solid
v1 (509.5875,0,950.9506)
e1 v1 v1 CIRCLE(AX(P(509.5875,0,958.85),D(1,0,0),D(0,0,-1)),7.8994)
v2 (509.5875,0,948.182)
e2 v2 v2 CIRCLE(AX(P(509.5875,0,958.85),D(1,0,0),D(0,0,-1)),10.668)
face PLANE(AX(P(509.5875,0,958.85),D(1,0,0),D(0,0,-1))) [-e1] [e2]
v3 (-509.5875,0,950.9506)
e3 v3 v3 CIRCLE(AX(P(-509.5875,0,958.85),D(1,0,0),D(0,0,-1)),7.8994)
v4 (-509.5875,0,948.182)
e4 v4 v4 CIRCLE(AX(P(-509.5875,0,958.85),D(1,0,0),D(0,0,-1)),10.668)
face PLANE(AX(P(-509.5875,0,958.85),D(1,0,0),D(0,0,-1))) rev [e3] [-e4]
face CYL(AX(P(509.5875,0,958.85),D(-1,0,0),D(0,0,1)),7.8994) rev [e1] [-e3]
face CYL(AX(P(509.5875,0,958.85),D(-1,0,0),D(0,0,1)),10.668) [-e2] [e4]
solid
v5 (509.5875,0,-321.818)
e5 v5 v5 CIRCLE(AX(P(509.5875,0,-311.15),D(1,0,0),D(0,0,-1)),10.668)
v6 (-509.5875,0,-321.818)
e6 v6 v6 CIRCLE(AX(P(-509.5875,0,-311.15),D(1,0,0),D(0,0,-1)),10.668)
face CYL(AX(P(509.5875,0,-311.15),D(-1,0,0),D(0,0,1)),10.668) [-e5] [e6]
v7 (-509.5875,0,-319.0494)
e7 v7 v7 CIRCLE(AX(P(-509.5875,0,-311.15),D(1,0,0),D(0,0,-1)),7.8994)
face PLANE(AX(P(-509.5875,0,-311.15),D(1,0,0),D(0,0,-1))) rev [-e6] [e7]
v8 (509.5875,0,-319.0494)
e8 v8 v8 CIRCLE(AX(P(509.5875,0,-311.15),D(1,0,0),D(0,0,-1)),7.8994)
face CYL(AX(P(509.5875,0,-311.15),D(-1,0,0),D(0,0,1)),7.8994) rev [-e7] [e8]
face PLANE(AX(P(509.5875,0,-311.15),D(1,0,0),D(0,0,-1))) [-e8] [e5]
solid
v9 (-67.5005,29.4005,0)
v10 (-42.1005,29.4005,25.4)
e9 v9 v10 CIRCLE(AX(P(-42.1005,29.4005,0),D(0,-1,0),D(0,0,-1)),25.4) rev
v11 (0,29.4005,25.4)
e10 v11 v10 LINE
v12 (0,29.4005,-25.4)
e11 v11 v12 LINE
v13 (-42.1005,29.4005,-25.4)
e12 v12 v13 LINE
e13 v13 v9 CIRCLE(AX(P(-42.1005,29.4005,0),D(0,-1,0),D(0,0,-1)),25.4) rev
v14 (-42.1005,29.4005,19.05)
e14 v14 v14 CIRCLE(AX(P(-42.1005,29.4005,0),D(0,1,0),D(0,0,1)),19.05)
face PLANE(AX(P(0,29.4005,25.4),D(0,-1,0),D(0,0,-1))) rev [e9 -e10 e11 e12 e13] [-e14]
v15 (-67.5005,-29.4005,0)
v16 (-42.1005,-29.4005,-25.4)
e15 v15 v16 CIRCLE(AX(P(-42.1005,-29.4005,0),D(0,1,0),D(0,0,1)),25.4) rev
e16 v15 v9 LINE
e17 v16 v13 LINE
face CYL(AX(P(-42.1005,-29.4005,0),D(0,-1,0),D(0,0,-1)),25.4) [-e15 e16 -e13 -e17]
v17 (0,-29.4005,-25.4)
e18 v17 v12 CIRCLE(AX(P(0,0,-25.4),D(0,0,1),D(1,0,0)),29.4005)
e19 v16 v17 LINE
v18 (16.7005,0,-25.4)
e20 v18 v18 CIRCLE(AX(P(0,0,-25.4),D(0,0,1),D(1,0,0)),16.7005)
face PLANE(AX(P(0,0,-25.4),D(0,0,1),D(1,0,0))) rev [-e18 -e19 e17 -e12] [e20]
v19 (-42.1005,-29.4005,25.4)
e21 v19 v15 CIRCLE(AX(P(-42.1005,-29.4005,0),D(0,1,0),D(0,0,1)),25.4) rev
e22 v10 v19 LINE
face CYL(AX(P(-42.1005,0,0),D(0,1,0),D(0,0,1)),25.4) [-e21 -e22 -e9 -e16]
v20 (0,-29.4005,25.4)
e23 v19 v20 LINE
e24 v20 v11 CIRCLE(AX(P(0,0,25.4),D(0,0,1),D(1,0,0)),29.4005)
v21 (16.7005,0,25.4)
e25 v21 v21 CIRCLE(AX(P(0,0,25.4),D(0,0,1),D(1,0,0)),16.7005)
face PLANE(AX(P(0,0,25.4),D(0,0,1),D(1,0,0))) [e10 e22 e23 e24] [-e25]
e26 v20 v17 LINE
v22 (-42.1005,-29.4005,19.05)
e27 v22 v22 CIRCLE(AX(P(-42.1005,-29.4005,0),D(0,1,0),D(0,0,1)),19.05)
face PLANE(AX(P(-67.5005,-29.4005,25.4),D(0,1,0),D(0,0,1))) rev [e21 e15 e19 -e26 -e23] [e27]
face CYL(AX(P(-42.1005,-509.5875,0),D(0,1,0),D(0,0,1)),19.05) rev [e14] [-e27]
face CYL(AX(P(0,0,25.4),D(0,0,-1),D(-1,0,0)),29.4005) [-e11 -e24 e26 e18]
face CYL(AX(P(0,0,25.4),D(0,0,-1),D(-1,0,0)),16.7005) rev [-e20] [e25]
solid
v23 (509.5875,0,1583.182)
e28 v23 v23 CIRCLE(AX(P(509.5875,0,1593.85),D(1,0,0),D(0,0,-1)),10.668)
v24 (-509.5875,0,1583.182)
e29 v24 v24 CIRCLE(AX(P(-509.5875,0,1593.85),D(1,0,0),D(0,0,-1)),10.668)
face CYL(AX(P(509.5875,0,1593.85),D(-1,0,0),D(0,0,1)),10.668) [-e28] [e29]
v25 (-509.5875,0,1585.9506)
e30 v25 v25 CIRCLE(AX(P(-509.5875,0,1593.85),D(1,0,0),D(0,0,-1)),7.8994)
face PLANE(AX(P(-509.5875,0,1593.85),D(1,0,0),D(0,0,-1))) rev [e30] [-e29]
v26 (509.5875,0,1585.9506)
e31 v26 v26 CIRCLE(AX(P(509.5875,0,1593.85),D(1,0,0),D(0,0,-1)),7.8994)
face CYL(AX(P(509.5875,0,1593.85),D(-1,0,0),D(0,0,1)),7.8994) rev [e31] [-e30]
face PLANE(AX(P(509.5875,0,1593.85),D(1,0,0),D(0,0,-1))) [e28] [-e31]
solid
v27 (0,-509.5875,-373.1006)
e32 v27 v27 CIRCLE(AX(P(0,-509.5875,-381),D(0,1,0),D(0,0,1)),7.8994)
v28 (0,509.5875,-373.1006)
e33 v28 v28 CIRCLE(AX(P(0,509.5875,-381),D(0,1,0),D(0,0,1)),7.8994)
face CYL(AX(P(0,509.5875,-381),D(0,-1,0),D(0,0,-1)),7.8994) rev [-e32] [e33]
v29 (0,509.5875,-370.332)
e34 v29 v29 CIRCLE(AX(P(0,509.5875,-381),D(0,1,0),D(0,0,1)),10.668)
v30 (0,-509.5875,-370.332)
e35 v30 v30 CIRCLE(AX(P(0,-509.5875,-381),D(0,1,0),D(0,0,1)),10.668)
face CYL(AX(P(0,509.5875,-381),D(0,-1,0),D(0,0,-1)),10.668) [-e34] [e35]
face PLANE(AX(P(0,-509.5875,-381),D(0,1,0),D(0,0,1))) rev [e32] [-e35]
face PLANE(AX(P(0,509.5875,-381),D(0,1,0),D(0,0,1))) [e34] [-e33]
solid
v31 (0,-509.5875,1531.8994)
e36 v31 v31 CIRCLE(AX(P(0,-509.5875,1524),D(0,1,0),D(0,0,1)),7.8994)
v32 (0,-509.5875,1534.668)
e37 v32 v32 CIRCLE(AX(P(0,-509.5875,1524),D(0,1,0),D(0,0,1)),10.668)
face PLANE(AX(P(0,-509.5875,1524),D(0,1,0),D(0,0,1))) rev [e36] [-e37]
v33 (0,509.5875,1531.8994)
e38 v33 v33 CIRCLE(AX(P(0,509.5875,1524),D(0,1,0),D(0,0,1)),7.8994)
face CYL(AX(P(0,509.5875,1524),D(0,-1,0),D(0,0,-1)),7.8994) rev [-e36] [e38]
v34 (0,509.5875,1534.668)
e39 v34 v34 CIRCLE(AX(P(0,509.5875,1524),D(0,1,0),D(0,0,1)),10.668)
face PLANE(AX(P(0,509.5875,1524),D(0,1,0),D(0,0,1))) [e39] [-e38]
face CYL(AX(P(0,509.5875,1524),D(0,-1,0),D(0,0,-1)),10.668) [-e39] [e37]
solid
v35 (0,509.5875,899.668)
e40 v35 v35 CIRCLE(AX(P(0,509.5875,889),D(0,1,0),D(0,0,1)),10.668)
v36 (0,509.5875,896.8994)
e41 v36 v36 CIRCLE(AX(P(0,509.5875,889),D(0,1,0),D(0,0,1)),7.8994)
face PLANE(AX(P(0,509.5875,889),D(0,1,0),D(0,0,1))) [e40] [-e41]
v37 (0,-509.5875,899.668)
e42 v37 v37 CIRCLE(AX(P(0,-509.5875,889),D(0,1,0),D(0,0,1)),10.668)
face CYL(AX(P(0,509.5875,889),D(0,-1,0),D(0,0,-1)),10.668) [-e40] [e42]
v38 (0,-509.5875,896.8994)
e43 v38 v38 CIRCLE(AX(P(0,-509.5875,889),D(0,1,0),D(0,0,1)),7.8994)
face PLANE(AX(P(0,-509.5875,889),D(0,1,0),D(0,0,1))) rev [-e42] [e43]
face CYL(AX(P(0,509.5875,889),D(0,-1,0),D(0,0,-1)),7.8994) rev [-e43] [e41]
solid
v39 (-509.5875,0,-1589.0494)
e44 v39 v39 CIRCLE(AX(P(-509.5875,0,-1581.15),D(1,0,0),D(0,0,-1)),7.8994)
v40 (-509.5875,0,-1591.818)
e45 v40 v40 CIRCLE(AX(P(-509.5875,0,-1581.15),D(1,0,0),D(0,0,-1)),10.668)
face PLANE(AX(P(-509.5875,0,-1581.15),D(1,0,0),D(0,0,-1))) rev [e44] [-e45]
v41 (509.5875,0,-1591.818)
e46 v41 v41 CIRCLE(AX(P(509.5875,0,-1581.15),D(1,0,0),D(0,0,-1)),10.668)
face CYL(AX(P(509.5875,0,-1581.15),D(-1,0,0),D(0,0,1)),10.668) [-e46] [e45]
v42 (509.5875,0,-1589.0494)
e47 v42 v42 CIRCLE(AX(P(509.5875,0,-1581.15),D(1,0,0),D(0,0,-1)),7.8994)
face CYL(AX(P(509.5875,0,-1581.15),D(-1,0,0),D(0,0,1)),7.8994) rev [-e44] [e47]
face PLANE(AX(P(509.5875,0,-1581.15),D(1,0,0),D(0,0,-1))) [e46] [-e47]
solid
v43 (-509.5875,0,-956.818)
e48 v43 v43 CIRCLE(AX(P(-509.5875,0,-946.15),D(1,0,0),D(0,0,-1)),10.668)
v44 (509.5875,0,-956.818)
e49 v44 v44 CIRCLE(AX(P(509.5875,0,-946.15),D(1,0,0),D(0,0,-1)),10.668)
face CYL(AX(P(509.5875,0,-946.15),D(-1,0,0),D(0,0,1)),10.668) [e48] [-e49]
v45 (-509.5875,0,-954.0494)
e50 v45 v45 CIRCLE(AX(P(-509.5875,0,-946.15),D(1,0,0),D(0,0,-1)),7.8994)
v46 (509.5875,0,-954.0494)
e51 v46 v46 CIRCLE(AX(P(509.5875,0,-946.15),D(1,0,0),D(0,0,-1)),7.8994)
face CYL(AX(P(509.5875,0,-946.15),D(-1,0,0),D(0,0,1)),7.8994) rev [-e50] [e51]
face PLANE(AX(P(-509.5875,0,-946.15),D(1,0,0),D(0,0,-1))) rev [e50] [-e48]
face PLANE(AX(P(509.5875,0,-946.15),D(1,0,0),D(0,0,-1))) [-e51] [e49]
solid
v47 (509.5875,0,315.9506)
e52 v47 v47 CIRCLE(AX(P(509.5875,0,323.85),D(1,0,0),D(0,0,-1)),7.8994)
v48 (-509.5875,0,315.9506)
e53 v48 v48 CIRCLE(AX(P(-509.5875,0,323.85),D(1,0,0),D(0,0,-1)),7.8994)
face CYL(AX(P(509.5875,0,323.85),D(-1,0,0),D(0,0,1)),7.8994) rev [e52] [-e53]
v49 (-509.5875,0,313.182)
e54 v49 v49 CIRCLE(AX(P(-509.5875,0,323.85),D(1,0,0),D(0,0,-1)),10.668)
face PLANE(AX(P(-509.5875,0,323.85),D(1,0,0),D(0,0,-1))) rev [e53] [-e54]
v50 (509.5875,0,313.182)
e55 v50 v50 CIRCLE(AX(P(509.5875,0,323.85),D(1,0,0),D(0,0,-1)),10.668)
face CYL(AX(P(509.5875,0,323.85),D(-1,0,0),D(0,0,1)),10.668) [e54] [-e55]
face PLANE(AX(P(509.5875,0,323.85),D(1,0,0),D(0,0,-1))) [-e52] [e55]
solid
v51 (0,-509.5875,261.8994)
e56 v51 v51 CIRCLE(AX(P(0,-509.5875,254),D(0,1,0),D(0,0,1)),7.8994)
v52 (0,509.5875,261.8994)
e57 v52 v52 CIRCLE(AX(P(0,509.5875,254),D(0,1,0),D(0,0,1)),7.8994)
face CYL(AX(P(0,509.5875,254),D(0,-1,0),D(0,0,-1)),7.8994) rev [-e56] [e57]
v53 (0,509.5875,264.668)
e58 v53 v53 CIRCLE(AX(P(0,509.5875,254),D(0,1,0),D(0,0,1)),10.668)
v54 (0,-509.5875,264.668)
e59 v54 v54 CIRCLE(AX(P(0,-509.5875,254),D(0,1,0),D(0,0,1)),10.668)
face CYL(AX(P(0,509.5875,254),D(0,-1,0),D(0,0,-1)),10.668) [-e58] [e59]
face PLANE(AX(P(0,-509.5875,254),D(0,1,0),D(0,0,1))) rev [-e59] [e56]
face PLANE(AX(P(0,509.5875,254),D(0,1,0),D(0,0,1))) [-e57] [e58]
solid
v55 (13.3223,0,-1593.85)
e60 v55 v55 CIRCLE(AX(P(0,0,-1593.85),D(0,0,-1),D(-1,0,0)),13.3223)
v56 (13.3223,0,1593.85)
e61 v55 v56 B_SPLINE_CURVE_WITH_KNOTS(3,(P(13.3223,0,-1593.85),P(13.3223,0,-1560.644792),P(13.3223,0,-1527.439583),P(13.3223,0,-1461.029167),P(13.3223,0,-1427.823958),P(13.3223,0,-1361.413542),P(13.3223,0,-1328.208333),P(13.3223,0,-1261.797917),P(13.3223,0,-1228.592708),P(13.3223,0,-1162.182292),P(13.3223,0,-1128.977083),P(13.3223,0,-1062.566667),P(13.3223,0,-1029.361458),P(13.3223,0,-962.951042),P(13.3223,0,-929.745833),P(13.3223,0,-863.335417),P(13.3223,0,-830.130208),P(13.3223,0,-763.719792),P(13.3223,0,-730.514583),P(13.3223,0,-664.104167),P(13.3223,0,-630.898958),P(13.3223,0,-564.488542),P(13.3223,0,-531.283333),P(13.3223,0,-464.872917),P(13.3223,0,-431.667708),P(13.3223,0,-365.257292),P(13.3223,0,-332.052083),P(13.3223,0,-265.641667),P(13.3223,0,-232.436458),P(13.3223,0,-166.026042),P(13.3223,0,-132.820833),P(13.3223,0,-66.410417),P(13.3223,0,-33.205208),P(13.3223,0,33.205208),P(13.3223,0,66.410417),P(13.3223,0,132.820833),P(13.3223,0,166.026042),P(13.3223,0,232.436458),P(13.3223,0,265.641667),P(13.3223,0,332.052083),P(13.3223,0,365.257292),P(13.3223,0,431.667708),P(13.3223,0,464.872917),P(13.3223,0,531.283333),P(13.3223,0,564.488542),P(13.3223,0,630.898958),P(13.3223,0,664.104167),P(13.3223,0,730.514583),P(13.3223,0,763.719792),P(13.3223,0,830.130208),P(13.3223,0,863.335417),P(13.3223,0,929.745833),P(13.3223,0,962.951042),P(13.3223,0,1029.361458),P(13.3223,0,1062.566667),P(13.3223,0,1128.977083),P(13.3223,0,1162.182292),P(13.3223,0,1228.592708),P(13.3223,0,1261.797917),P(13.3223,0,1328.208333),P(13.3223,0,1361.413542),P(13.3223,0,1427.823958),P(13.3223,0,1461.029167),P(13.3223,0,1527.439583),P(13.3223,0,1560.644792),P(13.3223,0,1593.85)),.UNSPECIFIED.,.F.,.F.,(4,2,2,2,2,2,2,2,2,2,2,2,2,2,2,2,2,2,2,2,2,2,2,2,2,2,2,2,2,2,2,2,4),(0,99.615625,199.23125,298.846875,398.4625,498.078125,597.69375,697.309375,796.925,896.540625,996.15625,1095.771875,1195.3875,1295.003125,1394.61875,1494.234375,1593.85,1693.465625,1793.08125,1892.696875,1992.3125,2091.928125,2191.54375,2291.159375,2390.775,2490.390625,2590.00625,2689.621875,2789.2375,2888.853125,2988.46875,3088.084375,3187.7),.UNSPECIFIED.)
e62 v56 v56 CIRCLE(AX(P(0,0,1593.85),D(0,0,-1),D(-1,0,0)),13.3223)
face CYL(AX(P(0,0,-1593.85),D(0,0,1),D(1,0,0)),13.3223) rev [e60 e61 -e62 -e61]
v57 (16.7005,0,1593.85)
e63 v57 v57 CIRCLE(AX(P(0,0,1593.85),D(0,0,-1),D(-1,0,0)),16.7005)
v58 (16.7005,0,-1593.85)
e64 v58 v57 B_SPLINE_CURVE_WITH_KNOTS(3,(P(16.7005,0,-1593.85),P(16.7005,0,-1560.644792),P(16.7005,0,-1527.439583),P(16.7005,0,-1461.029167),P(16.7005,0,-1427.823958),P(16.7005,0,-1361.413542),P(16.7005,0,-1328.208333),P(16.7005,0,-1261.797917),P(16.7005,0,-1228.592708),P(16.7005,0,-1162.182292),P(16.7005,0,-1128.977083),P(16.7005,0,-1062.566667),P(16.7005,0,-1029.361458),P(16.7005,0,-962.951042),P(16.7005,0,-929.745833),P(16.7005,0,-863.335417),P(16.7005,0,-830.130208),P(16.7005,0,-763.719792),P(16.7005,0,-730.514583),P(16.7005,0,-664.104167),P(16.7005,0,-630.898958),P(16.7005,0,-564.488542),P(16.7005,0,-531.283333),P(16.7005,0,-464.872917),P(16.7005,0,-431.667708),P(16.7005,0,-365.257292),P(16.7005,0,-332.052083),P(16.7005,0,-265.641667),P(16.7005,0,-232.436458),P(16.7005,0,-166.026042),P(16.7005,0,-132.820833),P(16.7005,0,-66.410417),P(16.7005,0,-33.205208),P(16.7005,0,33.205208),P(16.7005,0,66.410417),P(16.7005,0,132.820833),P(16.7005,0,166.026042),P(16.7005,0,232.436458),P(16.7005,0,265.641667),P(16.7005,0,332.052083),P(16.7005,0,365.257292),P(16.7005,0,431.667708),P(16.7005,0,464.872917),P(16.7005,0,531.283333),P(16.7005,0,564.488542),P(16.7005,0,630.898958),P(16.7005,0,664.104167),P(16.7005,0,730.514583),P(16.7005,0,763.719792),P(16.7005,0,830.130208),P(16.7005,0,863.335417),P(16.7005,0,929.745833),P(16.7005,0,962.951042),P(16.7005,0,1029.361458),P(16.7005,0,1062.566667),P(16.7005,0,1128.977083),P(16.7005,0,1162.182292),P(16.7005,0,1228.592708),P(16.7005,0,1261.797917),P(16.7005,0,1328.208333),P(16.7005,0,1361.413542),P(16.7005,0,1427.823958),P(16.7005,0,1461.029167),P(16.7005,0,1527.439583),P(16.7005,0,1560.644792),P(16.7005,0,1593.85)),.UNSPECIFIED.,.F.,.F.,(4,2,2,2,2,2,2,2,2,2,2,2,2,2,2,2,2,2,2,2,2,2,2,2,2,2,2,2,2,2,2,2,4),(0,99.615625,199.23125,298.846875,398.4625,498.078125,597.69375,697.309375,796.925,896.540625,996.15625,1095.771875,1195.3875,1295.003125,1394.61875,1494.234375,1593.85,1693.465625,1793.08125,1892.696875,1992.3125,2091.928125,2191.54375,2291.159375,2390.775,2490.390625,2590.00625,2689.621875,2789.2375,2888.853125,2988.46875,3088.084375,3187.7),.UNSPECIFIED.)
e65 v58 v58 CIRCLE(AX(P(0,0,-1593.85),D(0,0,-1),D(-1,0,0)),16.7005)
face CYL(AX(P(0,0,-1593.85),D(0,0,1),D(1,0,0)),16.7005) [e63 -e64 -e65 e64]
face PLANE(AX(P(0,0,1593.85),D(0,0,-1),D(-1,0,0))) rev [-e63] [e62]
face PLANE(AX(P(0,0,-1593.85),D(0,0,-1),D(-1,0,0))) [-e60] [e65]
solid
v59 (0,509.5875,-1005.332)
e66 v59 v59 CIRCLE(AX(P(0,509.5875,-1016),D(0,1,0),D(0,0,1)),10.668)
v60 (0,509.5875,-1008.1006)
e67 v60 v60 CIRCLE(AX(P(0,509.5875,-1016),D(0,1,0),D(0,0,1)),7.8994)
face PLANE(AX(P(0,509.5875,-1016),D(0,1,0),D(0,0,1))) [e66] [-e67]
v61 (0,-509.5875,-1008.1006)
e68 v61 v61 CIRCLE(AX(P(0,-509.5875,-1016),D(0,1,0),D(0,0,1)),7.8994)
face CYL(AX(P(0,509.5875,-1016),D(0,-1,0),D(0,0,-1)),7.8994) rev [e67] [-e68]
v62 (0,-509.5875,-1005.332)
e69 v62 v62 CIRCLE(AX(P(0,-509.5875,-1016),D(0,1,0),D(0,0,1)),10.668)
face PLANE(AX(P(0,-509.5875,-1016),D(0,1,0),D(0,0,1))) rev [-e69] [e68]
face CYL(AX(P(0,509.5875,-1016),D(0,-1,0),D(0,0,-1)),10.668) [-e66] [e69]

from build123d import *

# Parameters (mm, degrees)
SKETCH11_R                 = 16.7005
SKETCH11_R_2               = 13.3223
PIPE_1_0_SCH_40_1_DEPTH    = 3187.7
SKETCH12_R                 = 10.668
SKETCH12_R_2               = 7.8994
PIPE_0_5_SCH_40_1_DEPTH    = 1019.175
SKETCH12_ON_SEGMENT_2_R    = 10.668
SKETCH12_ON_SEGMENT_2_R_2  = 7.8994
PIPE_0_5_SCH_40_1_2_DEPTH  = 1019.175
SKETCH12_ON_SEGMENT_3_R    = 10.668
SKETCH12_ON_SEGMENT_3_R_2  = 7.8994
PIPE_0_5_SCH_40_1_3_DEPTH  = 1019.175
SKETCH12_ON_SEGMENT_4_R    = 10.668
SKETCH12_ON_SEGMENT_4_R_2  = 7.8994
PIPE_0_5_SCH_40_1_4_DEPTH  = 1019.175
SKETCH12_ON_SEGMENT_5_R    = 10.668
SKETCH12_ON_SEGMENT_5_R_2  = 7.8994
PIPE_0_5_SCH_40_1_5_DEPTH  = 1019.175
SKETCH12_ON_SEGMENT_6_R    = 10.668
SKETCH12_ON_SEGMENT_6_R_2  = 7.8994
PIPE_0_5_SCH_40_1_6_DEPTH  = 1019.175
SKETCH12_ON_SEGMENT_7_R    = 10.668
SKETCH12_ON_SEGMENT_7_R_2  = 7.8994
PIPE_0_5_SCH_40_1_7_DEPTH  = 1019.175
SKETCH12_ON_SEGMENT_8_R    = 10.668
SKETCH12_ON_SEGMENT_8_R_2  = 7.8994
PIPE_0_5_SCH_40_1_8_DEPTH  = 1019.175
SKETCH12_ON_SEGMENT_9_R    = 10.668
SKETCH12_ON_SEGMENT_9_R_2  = 7.8994
PIPE_0_5_SCH_40_1_9_DEPTH  = 1019.175
SKETCH12_ON_SEGMENT_10_R   = 10.668
SKETCH12_ON_SEGMENT_10_R_2 = 7.8994
PIPE_0_5_SCH_40_1_10_DEPTH = 1019.175
SKETCH12_ON_SEGMENT_11_R   = 10.668
SKETCH12_ON_SEGMENT_11_R_2 = 7.8994
PIPE_0_5_SCH_40_1_11_DEPTH = 1019.175
SKETCH14_R                 = 16.7005
BOSS_EXTRUDE1_DEPTH        = 25.4
FILLET1_R                  = 25.4
SKETCH15_R                 = 19.05
CUT_EXTRUDE1_DEPTH         = 1768.672338592


with BuildPart() as part:
    # Sketch11 → Pipe 1.0 SCH 40(1) (new body)
    with BuildSketch(Plane(origin=(0, 0, 1593.85), x_dir=(-1, 0, 0), z_dir=(0, 0, -1))):
        Circle(SKETCH11_R)
        Circle(SKETCH11_R_2, mode=Mode.SUBTRACT)
    extrude(amount=PIPE_1_0_SCH_40_1_DEPTH)


with BuildPart() as body_2:
    # Sketch12 → Pipe 0.5 SCH 40(1) (new body)
    with BuildSketch(Plane(origin=(-509.5875, 0, 1593.85), x_dir=(0, 0, -1), z_dir=(1, 0, 0))):
        Circle(SKETCH12_R)
        Circle(SKETCH12_R_2, mode=Mode.SUBTRACT)
    extrude(amount=PIPE_0_5_SCH_40_1_DEPTH)


with BuildPart() as body_3:
    # Sketch12 on segment 2 (carried to segment 2) → Pipe 0.5 SCH 40_1 2 (new body)
    with BuildSketch(Plane(origin=(0, -509.5875, 1524), x_dir=(0, 0, -1), z_dir=(0, 1, 0))):
        Circle(SKETCH12_ON_SEGMENT_2_R)
        Circle(SKETCH12_ON_SEGMENT_2_R_2, mode=Mode.SUBTRACT)
    extrude(amount=PIPE_0_5_SCH_40_1_2_DEPTH)


with BuildPart() as body_4:
    # Sketch12 on segment 3 (carried to segment 3) → Pipe 0.5 SCH 40_1 3 (new body)
    with BuildSketch(Plane(origin=(-509.5875, 0, 958.85), x_dir=(0, 0, -1), z_dir=(1, 0, 0))):
        Circle(SKETCH12_ON_SEGMENT_3_R)
        Circle(SKETCH12_ON_SEGMENT_3_R_2, mode=Mode.SUBTRACT)
    extrude(amount=PIPE_0_5_SCH_40_1_3_DEPTH)


with BuildPart() as body_5:
    # Sketch12 on segment 4 (carried to segment 4) → Pipe 0.5 SCH 40_1 4 (new body)
    with BuildSketch(Plane(origin=(0, -509.5875, 889), x_dir=(0, 0, -1), z_dir=(0, 1, 0))):
        Circle(SKETCH12_ON_SEGMENT_4_R)
        Circle(SKETCH12_ON_SEGMENT_4_R_2, mode=Mode.SUBTRACT)
    extrude(amount=PIPE_0_5_SCH_40_1_4_DEPTH)


with BuildPart() as body_6:
    # Sketch12 on segment 5 (carried to segment 5) → Pipe 0.5 SCH 40_1 5 (new body)
    with BuildSketch(Plane(origin=(0, -509.5875, 254), x_dir=(0, 0, -1), z_dir=(0, 1, 0))):
        Circle(SKETCH12_ON_SEGMENT_5_R)
        Circle(SKETCH12_ON_SEGMENT_5_R_2, mode=Mode.SUBTRACT)
    extrude(amount=PIPE_0_5_SCH_40_1_5_DEPTH)


with BuildPart() as body_7:
    # Sketch12 on segment 6 (carried to segment 6) → Pipe 0.5 SCH 40_1 6 (new body)
    with BuildSketch(Plane(origin=(-509.5875, 0, 323.85), x_dir=(0, 0, -1), z_dir=(1, 0, 0))):
        Circle(SKETCH12_ON_SEGMENT_6_R)
        Circle(SKETCH12_ON_SEGMENT_6_R_2, mode=Mode.SUBTRACT)
    extrude(amount=PIPE_0_5_SCH_40_1_6_DEPTH)


with BuildPart() as body_8:
    # Sketch12 on segment 7 (carried to segment 7) → Pipe 0.5 SCH 40_1 7 (new body)
    with BuildSketch(Plane(origin=(-509.5875, 0, -311.15), x_dir=(0, 0, -1), z_dir=(1, 0, 0))):
        Circle(SKETCH12_ON_SEGMENT_7_R)
        Circle(SKETCH12_ON_SEGMENT_7_R_2, mode=Mode.SUBTRACT)
    extrude(amount=PIPE_0_5_SCH_40_1_7_DEPTH)


with BuildPart() as body_9:
    # Sketch12 on segment 8 (carried to segment 8) → Pipe 0.5 SCH 40_1 8 (new body)
    with BuildSketch(Plane(origin=(0, -509.5875, -381), x_dir=(0, 0, -1), z_dir=(0, 1, 0))):
        Circle(SKETCH12_ON_SEGMENT_8_R)
        Circle(SKETCH12_ON_SEGMENT_8_R_2, mode=Mode.SUBTRACT)
    extrude(amount=PIPE_0_5_SCH_40_1_8_DEPTH)


with BuildPart() as body_10:
    # Sketch12 on segment 9 (carried to segment 9) → Pipe 0.5 SCH 40_1 9 (new body)
    with BuildSketch(Plane(origin=(0, -509.5875, -1016), x_dir=(0, 0, -1), z_dir=(0, 1, 0))):
        Circle(SKETCH12_ON_SEGMENT_9_R)
        Circle(SKETCH12_ON_SEGMENT_9_R_2, mode=Mode.SUBTRACT)
    extrude(amount=PIPE_0_5_SCH_40_1_9_DEPTH)


with BuildPart() as body_11:
    # Sketch12 on segment 10 (carried to segment 10) → Pipe 0.5 SCH 40_1 10 (new body)
    with BuildSketch(Plane(origin=(-509.5875, 0, -946.15), x_dir=(0, 0, -1), z_dir=(1, 0, 0))):
        Circle(SKETCH12_ON_SEGMENT_10_R)
        Circle(SKETCH12_ON_SEGMENT_10_R_2, mode=Mode.SUBTRACT)
    extrude(amount=PIPE_0_5_SCH_40_1_10_DEPTH)


with BuildPart() as body_12:
    # Sketch12 on segment 11 (carried to segment 11) → Pipe 0.5 SCH 40_1 11 (new body)
    with BuildSketch(Plane(origin=(-509.5875, 0, -1581.15), x_dir=(0, 0, -1), z_dir=(1, 0, 0))):
        Circle(SKETCH12_ON_SEGMENT_11_R)
        Circle(SKETCH12_ON_SEGMENT_11_R_2, mode=Mode.SUBTRACT)
    extrude(amount=PIPE_0_5_SCH_40_1_11_DEPTH)


with BuildPart() as body_13:
    # Sketch14 → Boss-Extrude1 (new, symmetric)
    with BuildSketch(Plane.XY):
        with BuildLine():
            Line((-67.5005, -29.4005), (-67.5005, 29.4005))
            Line((-67.5005, 29.4005), (0, 29.4005))
            ThreePointArc((0, 29.4005), (29.4005, 0), (0, -29.4005))
            Line((0, -29.4005), (-67.5005, -29.4005))
        make_face()
        Circle(SKETCH14_R, mode=Mode.SUBTRACT)
    extrude(amount=BOSS_EXTRUDE1_DEPTH, both=True)

    # Fillet1
    fillet1_edges = [body_13.edges().sort_by_distance(p)[0] for p in [
        (-67.5005, 0, -25.4),
        (-67.5005, 0, 25.4),
    ]]
    fillet(fillet1_edges, radius=FILLET1_R - 0.0001)  # a hair under: the kernel refuses the full size

    # Sketch15 → Cut-Extrude1 (cut, through all)
    with BuildSketch(Plane(origin=(0, 29.4005, 0), x_dir=(1, 0, 0), z_dir=(0, 1, 0))):
        with Locations(Location((-42.1005, 0, 0), (0, 0, 270))):
            Circle(SKETCH15_R)
    extrude(amount=-CUT_EXTRUDE1_DEPTH, mode=Mode.SUBTRACT)


solid = Compound([part.part, body_2.part, body_3.part, body_4.part, body_5.part, body_6.part, body_7.part, body_8.part, body_9.part, body_10.part, body_11.part, body_12.part, body_13.part])
